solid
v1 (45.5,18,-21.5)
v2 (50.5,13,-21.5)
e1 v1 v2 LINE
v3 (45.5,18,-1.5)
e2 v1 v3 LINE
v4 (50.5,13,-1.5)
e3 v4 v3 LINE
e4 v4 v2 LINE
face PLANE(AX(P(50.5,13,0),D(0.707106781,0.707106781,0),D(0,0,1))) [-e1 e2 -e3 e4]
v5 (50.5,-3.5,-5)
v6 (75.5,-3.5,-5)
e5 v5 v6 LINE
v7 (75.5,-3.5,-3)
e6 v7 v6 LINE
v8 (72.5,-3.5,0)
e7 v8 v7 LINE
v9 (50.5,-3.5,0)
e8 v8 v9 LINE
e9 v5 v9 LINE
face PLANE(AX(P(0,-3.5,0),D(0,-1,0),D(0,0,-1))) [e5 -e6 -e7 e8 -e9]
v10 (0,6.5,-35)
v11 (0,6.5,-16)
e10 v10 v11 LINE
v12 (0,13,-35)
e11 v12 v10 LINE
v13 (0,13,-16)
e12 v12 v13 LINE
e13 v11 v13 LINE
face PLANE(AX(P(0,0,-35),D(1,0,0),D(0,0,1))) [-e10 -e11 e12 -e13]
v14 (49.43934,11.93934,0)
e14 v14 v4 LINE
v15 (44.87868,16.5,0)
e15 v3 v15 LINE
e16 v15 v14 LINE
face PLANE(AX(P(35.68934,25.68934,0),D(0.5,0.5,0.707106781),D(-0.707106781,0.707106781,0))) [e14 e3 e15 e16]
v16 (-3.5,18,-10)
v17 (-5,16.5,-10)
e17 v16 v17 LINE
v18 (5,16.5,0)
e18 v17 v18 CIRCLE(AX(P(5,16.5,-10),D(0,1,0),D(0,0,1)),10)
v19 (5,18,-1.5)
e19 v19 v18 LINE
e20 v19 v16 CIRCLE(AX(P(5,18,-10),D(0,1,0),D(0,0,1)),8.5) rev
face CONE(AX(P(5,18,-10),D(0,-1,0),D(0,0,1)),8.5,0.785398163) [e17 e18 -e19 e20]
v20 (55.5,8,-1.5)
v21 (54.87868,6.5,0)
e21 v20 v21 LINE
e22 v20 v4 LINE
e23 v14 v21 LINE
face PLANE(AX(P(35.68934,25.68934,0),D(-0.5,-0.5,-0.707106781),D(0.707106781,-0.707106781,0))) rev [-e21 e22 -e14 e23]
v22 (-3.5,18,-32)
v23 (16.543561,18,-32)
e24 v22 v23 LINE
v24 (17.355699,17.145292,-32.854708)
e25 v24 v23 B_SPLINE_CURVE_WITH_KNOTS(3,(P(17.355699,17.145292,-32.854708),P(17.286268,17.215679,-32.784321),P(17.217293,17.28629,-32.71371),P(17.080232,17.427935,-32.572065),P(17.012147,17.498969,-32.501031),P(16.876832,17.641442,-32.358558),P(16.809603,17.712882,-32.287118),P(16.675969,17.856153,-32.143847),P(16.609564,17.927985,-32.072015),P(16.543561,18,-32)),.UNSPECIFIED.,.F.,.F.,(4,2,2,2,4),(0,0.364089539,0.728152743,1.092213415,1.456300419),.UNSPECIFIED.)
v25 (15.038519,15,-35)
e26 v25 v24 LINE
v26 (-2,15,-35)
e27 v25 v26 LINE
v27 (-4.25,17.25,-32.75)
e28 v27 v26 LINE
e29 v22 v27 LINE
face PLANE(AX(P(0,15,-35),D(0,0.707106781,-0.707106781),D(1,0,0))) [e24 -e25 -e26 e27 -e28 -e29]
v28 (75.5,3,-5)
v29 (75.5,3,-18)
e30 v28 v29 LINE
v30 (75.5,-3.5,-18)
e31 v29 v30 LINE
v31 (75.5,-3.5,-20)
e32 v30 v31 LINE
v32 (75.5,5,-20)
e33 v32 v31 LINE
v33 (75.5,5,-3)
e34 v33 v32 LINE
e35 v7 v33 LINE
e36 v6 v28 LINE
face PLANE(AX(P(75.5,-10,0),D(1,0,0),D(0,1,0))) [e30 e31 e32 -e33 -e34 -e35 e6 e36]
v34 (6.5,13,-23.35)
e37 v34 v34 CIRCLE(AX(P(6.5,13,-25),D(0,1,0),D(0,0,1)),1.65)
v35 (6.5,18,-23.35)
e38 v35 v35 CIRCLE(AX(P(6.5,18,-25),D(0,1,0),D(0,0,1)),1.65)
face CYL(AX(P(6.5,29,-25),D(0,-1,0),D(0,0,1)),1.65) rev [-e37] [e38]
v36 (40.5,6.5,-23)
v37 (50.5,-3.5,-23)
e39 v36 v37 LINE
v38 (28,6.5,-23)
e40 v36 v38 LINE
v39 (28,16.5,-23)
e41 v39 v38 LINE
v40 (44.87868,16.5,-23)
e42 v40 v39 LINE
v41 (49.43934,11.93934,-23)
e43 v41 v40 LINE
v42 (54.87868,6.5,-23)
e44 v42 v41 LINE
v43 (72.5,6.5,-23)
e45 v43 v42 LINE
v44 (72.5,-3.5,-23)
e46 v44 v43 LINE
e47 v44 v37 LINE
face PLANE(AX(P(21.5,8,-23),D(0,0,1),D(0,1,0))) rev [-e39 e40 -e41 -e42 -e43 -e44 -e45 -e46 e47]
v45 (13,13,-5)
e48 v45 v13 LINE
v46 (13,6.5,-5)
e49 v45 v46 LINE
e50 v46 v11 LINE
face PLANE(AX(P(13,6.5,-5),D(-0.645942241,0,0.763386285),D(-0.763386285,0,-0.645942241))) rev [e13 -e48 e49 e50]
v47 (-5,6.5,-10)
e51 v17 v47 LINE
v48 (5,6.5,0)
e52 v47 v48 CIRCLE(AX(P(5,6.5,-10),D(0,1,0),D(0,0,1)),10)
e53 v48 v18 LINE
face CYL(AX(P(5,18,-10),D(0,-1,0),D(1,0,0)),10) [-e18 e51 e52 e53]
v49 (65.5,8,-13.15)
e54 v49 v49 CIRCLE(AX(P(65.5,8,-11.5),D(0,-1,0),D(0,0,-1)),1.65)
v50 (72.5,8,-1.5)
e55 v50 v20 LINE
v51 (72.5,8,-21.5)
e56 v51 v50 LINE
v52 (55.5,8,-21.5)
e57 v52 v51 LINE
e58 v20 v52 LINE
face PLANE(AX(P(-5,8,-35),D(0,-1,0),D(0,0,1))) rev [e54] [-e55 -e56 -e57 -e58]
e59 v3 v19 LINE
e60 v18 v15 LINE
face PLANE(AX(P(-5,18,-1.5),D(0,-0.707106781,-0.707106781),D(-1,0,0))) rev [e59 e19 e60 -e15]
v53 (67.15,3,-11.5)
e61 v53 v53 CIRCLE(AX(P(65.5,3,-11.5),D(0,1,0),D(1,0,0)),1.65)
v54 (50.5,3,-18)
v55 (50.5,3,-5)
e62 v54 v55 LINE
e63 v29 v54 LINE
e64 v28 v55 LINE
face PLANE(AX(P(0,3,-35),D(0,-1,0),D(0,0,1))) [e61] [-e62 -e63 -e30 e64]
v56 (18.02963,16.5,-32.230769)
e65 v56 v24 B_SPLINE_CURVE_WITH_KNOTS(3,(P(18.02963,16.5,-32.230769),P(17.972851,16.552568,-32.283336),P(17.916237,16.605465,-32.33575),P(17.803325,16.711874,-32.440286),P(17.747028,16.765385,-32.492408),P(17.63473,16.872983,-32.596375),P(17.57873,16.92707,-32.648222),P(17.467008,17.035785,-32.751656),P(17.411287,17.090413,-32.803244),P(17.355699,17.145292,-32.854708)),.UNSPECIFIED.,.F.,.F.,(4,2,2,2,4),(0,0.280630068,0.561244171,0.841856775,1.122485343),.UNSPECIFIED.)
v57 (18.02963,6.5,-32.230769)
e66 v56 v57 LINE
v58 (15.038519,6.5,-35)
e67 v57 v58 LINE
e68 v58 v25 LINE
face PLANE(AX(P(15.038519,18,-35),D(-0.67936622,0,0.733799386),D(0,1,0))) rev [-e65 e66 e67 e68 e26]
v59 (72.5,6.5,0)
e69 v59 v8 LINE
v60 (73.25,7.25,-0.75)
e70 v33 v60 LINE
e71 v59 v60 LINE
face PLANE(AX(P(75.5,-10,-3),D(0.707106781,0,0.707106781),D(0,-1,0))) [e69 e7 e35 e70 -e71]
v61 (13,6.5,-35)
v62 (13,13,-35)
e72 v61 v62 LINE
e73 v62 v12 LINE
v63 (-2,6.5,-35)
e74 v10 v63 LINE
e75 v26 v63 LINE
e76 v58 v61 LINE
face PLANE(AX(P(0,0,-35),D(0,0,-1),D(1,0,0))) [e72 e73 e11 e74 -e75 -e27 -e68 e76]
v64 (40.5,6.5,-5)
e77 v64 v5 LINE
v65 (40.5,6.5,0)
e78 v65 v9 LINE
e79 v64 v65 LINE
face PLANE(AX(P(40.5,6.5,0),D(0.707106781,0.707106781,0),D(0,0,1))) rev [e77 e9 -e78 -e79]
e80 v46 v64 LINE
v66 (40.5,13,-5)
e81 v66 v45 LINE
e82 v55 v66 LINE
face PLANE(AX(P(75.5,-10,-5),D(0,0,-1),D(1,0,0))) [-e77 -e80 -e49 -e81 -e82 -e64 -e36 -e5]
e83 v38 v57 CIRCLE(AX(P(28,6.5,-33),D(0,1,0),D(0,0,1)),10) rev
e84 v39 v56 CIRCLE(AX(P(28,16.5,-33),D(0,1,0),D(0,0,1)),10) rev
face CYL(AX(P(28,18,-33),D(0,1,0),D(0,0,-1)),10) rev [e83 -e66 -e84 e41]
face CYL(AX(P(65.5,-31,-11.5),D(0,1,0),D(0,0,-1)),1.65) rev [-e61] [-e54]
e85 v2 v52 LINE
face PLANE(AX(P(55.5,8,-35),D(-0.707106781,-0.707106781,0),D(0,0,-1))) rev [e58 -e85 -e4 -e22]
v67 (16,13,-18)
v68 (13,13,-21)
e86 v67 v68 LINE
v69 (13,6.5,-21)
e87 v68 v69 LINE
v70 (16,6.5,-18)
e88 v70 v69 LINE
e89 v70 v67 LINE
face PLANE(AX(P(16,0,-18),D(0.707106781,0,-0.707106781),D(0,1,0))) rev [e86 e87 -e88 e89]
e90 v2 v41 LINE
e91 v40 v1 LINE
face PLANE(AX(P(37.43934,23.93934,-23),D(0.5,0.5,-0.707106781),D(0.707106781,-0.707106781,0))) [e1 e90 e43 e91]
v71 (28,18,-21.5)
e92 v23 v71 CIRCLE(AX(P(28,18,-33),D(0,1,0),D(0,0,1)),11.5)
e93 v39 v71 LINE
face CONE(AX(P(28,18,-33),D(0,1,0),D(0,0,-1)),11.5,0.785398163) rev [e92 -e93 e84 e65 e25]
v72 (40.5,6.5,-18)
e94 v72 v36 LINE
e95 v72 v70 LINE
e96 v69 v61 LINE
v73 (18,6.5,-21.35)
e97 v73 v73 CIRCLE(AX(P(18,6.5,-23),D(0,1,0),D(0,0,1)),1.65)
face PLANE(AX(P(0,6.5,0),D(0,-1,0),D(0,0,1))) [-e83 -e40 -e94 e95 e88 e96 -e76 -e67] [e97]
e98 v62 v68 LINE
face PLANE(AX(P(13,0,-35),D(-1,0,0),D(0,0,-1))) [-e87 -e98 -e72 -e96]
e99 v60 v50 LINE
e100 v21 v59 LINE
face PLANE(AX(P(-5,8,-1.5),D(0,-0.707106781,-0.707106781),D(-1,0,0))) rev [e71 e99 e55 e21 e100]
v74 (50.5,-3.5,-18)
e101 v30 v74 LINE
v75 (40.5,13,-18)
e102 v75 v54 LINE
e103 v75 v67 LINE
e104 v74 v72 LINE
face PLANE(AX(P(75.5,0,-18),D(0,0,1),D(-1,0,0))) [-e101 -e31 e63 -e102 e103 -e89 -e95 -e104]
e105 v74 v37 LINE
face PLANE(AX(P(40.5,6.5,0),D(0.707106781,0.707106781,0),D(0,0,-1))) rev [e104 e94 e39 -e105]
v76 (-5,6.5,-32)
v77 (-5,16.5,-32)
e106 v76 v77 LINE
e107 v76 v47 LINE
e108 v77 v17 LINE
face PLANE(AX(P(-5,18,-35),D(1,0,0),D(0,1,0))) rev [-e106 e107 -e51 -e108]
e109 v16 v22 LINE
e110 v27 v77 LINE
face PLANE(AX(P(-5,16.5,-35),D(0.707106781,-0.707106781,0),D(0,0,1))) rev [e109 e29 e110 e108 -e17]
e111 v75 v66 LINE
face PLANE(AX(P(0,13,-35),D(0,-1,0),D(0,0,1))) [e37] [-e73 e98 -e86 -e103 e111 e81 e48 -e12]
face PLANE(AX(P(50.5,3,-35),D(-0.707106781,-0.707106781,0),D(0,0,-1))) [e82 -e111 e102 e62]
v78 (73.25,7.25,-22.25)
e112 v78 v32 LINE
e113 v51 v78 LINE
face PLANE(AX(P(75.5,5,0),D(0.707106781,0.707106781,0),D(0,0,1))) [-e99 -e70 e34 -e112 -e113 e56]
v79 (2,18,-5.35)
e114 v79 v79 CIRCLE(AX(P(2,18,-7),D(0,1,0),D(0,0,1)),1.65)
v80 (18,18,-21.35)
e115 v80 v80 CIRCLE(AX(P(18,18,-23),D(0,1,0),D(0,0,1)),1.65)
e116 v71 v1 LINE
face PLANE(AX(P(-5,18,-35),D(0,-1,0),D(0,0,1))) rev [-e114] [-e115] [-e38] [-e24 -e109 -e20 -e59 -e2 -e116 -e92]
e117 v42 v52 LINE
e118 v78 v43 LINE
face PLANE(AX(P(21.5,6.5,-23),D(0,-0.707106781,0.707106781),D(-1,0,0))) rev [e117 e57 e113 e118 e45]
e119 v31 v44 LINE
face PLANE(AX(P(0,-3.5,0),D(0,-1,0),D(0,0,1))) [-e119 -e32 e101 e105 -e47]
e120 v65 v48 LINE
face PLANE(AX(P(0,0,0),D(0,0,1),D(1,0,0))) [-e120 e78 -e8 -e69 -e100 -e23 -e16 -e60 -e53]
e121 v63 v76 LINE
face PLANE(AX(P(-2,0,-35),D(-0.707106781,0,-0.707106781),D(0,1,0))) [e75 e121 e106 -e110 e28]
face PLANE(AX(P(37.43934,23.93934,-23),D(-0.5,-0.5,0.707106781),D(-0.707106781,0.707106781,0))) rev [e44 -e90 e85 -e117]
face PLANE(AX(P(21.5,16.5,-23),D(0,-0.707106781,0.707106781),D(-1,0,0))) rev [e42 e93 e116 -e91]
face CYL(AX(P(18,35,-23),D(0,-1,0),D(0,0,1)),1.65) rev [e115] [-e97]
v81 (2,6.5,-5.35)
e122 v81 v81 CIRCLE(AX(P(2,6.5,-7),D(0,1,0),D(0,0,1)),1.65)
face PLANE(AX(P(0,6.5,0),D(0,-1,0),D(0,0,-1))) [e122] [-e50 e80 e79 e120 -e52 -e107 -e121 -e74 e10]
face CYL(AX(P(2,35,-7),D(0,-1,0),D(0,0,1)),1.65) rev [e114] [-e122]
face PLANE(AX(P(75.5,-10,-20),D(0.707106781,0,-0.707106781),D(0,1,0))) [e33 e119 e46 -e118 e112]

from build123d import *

# Parameters (mm, degrees)
SKETCH_1_W          = 23
SKETCH_1_H          = 23
SKETCH_1_W_2        = 13
SKETCH_1_H_2        = 13
EXTRUDE_1_DEPTH     = 35
SKETCH_2_R          = 1.65
CUT_EXTRUDE_1_DEPTH = 34
SKETCH_4_W          = 23
SKETCH_4_H          = 23
SKETCH_4_R          = 3
EXTRUDE_2_DEPTH     = 3.5
SKETCH_5_W          = 23
SKETCH_5_H          = 23
SKETCH_5_W_2        = 13
SKETCH_5_H_2        = 13
EXTRUDE_1_2_DEPTH   = 54
SKETCH_6_R          = 1.65
CUT_EXTRUDE_2_DEPTH = 39
SKETCH_7_W          = 13
SKETCH_7_H          = 13
CUT_EXTRUDE_3_DEPTH = 13
CHAMFER_1_SIZE      = 3
SKETCH_8_W          = 80.5
SKETCH_8_H          = 35
CUT_EXTRUDE_4_DEPTH = 11.5
EXTRUDE_3_DEPTH     = 6.5
FILLET_1_R          = 10
FILLET_2_R          = 10
SKETCH_10_R         = 1.65
CUT_EXTRUDE_5_DEPTH = 28.5
CHAMFER_4_SIZE      = 3
CHAMFER_START       = 6.5
CHAMFER_5_DEPTH     = 11.5
SKETCH_11_W         = 10
SKETCH_11_H         = 13
EXTRUDE_4_DEPTH     = 10
CHAMFER_9_SIZE      = 5
CHAMFER_10_SIZE     = 5
CHAMFER_11_SIZE     = 10
CHAMFER_12_SIZE     = 10
CHAMFER_13_SIZE     = 1.5
CHAMFER_14_SIZE     = 1.5
SKETCH_12_W         = 99.580162389
SKETCH_12_H         = 41.70081518
CUT_EXTRUDE_6_DEPTH = 35


with BuildPart() as part:
    # 草图1 → Extrude 1 (new body)
    with BuildSketch(Plane.XY):
        with Locations((6.5, 6.5)):
            Rectangle(SKETCH_1_W, SKETCH_1_H)
        with Locations((6.5, 6.5)):
            Rectangle(SKETCH_1_W_2, SKETCH_1_H_2, mode=Mode.SUBTRACT)
    extrude(amount=EXTRUDE_1_DEPTH)

    # 草图2 → 切除-拉伸1 (cut)
    with BuildSketch(Plane.XZ.offset(5)):
        with Locations(Location((6.5, 25, 0), (0, 0, 270))):
            Circle(SKETCH_2_R)
    extrude(amount=-CUT_EXTRUDE_1_DEPTH, mode=Mode.SUBTRACT)

    # 草图4 → 凸台-拉伸2 (add)
    with BuildSketch(Plane(origin=(18, 0, 0), x_dir=(0, 0, -1), z_dir=(1, 0, 0))):
        with Locations((-11.5, 6.5)):
            Rectangle(SKETCH_4_W, SKETCH_4_H)
        with Locations(Location((-11.5, 6.5, 0), (0, 0, 90))):
            Circle(SKETCH_4_R, mode=Mode.SUBTRACT)
    extrude(amount=EXTRUDE_2_DEPTH)

    # 草图5 → Extrude 1 2 (add)
    with BuildSketch(Plane(origin=(21.5, 0, 0), x_dir=(0, 0, -1), z_dir=(1, 0, 0))):
        with Locations((-11.5, 6.5)):
            Rectangle(SKETCH_5_W, SKETCH_5_H)
        with Locations((-11.5, 6.5)):
            Rectangle(SKETCH_5_W_2, SKETCH_5_H_2, mode=Mode.SUBTRACT)
    extrude(amount=EXTRUDE_1_2_DEPTH)

    # 草图6 → 切除-拉伸2 (cut)
    with BuildSketch(Plane(origin=(0, 18, 0), x_dir=(1, 0, 0), z_dir=(0, 1, 0))):
        with Locations(Location((65.5, -11.5, 0), (0, 0, 270))):
            Circle(SKETCH_6_R)
    extrude(amount=-CUT_EXTRUDE_2_DEPTH, mode=Mode.SUBTRACT)

    # 草图7 → 切除-拉伸3 (cut)
    with BuildSketch(Plane(origin=(21.5, 0, 0), x_dir=(0, 0, -1), z_dir=(1, 0, 0))):
        with Locations((-11.5, 6.5)):
            Rectangle(SKETCH_7_W, SKETCH_7_H)
    extrude(amount=-CUT_EXTRUDE_3_DEPTH, mode=Mode.SUBTRACT)

    # 倒角1
    chamfer_1_edges = [part.edges().sort_by_distance(p)[0] for p in [
        (13, 6.5, 18),
    ]]
    chamfer(chamfer_1_edges, length=CHAMFER_1_SIZE)

    # 草图8 → 切除-拉伸4 (cut)
    with BuildSketch(Plane.XZ.offset(5)):
        with Locations((35.25, 17.5)):
            Rectangle(SKETCH_8_W, SKETCH_8_H)
    extrude(amount=-CUT_EXTRUDE_4_DEPTH, mode=Mode.SUBTRACT)

    # 草图9 → 凸台-拉伸3 (add)
    with BuildSketch(Plane.XZ.offset(-13)):
        Polygon((13, 5), (0, 16), (0, 0), (13, 0), align=None)
    extrude(amount=EXTRUDE_3_DEPTH)

    # 圆角1
    fillet_1_edges = [part.edges().sort_by_distance(p)[0] for p in [
        (-5, 12.25, 0),
    ]]
    fillet(fillet_1_edges, radius=FILLET_1_R)

    # 圆角2
    fillet_2_edges = [part.edges().sort_by_distance(p)[0] for p in [
        (18, 12.25, 23),
    ]]
    fillet(fillet_2_edges, radius=FILLET_2_R)

    # 草图10 → 切除-拉伸5 (cut)
    with BuildSketch(Plane.XZ.offset(-6.5)):
        with Locations(Location((2, 7, 0), (0, 0, 270))):
            Circle(SKETCH_10_R)
        with Locations(Location((18, 23, 0), (0, 0, 270))):
            Circle(SKETCH_10_R)
    extrude(amount=-CUT_EXTRUDE_5_DEPTH, mode=Mode.SUBTRACT)

    # 倒角4
    chamfer_4_edges = [part.edges().sort_by_distance(p)[0] for p in [
        (75.5, 18, 11.5),
        (6.5, 18, 35),
    ]]
    chamfer(chamfer_4_edges, length=CHAMFER_4_SIZE)

    # 倒角5: read off the stored shape, not the designer's step
    # 倒角5 outline → 倒角5 (cut)
    with BuildSketch(Plane(origin=(0, 0, 0), x_dir=(1, 0, 0), z_dir=(0, 1, 0)).offset(CHAMFER_START)):
        Polygon((72.5, 0), (75.5, -3), (75.5, 0), align=None)
        Polygon((-5, -35), (-2, -35), (-5, -32), align=None)
        with BuildLine():
            ThreePointArc((18, -33), (18.007410169, -32.615099398), (18.029629695, -32.230769231))
            Line((18.029629695, -32.230769231), (15.038518603, -35))
            Line((15.038518603, -35), (18, -35))
            Line((18, -35), (18, -33))
        make_face()
        Polygon((75.5, -20), (72.5, -23), (75.5, -23), align=None)
    extrude(amount=CHAMFER_5_DEPTH, mode=Mode.SUBTRACT)


with BuildPart() as body_2:
    # Split Bodies 1: the piece on the far side of the plane
    add(part.part)
    split(bisect_by=Plane.YZ.offset(50.5), keep=Keep.BOTTOM)


with BuildPart() as part_1:
    add(part.part)

    # Split Bodies 1
    split(bisect_by=Plane.YZ.offset(50.5), keep=Keep.TOP)


with BuildPart() as part_2:
    # Move Body 1: read off the stored shape, not the designer's step
    # Move Body 1: moved
    add(part_1.part.moved(Location((0, -10, 0))))

    # Combine 1: union body 2
    add(body_2.part)

    # 草图11 → 凸台-拉伸4 (add)
    with BuildSketch(Plane.XZ.offset(-13)):
        with Locations((45.5, 11.5)):
            Rectangle(SKETCH_11_W, SKETCH_11_H)
    extrude(amount=EXTRUDE_4_DEPTH)

    # 倒角9
    chamfer_9_edges = [part_2.edges().sort_by_distance(p)[0] for p in [
        (50.5, 18, 11.5),
    ]]
    chamfer(chamfer_9_edges, length=CHAMFER_9_SIZE)

    # 倒角10
    chamfer_10_edges = [part_2.edges().sort_by_distance(p)[0] for p in [
        (50.5, 8, 11.5),
    ]]
    chamfer(chamfer_10_edges, length=CHAMFER_10_SIZE - 0.0001)  # a hair under: the kernel refuses the full size

    # 倒角11
    # the kernel refuses this chamfer: 10 mm, written as the material it adds along each edge
    with BuildSketch(Plane(origin=(50.5, 6.5, 30.71682988), x_dir=(-1, 0, 0), z_dir=(0, 0, -1))) as chamfer_11_piece_1_section:
        Polygon((CHAMFER_11_SIZE, 0), (0, -CHAMFER_11_SIZE), (0, 0), align=None)
    chamfer_11_piece_1 = extrude(amount=30.71682988, mode=Mode.PRIVATE)
    chamfer_11_piece_1 = split(chamfer_11_piece_1, bisect_by=Plane(origin=(50.5, -3.5, 30.71682988), z_dir=(0, 1, 0)), keep=Keep.TOP, mode=Mode.PRIVATE)
    chamfer_11_piece_1 = split(chamfer_11_piece_1, bisect_by=Plane(origin=(50.5, 6.5, 23), z_dir=(0, 0, -1)), keep=Keep.TOP, mode=Mode.PRIVATE)
    chamfer_11_piece_1 = split(chamfer_11_piece_1, bisect_by=Plane(origin=(50.5, 6.5, 18), z_dir=(0, 0, 1)), keep=Keep.TOP, mode=Mode.PRIVATE)
    add(chamfer_11_piece_1)
    with BuildSketch(Plane(origin=(50.5, 6.5, 5), x_dir=(-1, 0, 0), z_dir=(0, 0, -1))) as chamfer_11_piece_2_section:
        Polygon((CHAMFER_11_SIZE, 0), (0, -CHAMFER_11_SIZE), (0, 0), align=None)
    chamfer_11_piece_2 = extrude(amount=5, mode=Mode.PRIVATE)
    chamfer_11_piece_2 = split(chamfer_11_piece_2, bisect_by=Plane(origin=(50.5, -3.5, 5), z_dir=(0, 1, 0)), keep=Keep.TOP, mode=Mode.PRIVATE)
    add(chamfer_11_piece_2)
    with BuildSketch(Plane(origin=(50.5, 6.5, 23), x_dir=(-1, 0, 0), z_dir=(0, 0, -1))) as chamfer_11_piece_3_section:
        Polygon((CHAMFER_11_SIZE, 0), (0, -CHAMFER_11_SIZE), (0, 0), align=None)
    chamfer_11_piece_3 = extrude(amount=5, mode=Mode.PRIVATE)
    chamfer_11_piece_3 = split(chamfer_11_piece_3, bisect_by=Plane(origin=(50.5, -3.5, 23), z_dir=(0, 1, 0)), keep=Keep.TOP, mode=Mode.PRIVATE)
    add(chamfer_11_piece_3)
    with BuildSketch(Plane(origin=(50.5, 6.5, 23), x_dir=(-1, 0, 0), z_dir=(0, 0, -1))) as chamfer_11_piece_4_section:
        Polygon((CHAMFER_11_SIZE, 0), (0, -CHAMFER_11_SIZE), (0, 0), align=None)
    chamfer_11_piece_4 = extrude(amount=30.71682988, mode=Mode.PRIVATE)
    chamfer_11_piece_4 = split(chamfer_11_piece_4, bisect_by=Plane(origin=(50.5, 6.5, 0), z_dir=(0, 0, 1)), keep=Keep.TOP, mode=Mode.PRIVATE)
    chamfer_11_piece_4 = split(chamfer_11_piece_4, bisect_by=Plane(origin=(50.5, -3.5, 23), z_dir=(0, 1, 0)), keep=Keep.TOP, mode=Mode.PRIVATE)
    chamfer_11_piece_4 = split(chamfer_11_piece_4, bisect_by=Plane(origin=(50.5, 6.5, 5), z_dir=(0, 0, -1)), keep=Keep.TOP, mode=Mode.PRIVATE)
    add(chamfer_11_piece_4)

    # 倒角12
    # the kernel refuses this chamfer: 10 mm, written as the material it takes off along each edge
    with BuildSketch(Plane(origin=(40.5, 3, 5), x_dir=(1, 0, 0), z_dir=(0, 0, 1))) as chamfer_12_piece_1:
        Polygon((CHAMFER_12_SIZE, 0), (0, CHAMFER_12_SIZE), (0, 0), align=None)
    extrude(amount=13, mode=Mode.SUBTRACT)

    # 倒角13
    chamfer_13_edges = [part_2.edges().sort_by_distance(p)[0] for p in [
        (-5, 18, 21),
        (-2.071067812, 18, 2.928932188),
        (25.25, 18, 0),
        (21.291796068, 18, 25.583801513),
        (36.75, 18, 23),
    ]]
    chamfer(chamfer_13_edges, length=CHAMFER_13_SIZE)

    # 倒角14
    chamfer_14_edges = [part_2.edges().sort_by_distance(p)[0] for p in [
        (48.75, 14.75, 0),
        (50.5, 12.99995, 0),
        (52.99995, 10.49995, 0),
        (63.99995, 8, 0),
        (48.75, 14.75, 23),
        (50.5, 12.99995, 23),
        (52.99995, 10.49995, 23),
        (63.99995, 8, 23),
    ]]
    chamfer(chamfer_14_edges, length=CHAMFER_14_SIZE)

    # 镜向1: part across face


with BuildPart() as part_3:
    add(part_2.part)
    add(part_2.part.mirror(Plane(origin=(39.29455316, 7.74366918, 0), x_dir=(1, 0, 0), z_dir=(0, 0, -1))))

    # 草图12 → 切除-拉伸6 (cut)
    with BuildSketch(Plane.XY.offset(35)):
        with Locations((40.094907988, 6.821209465)):
            Rectangle(SKETCH_12_W, SKETCH_12_H)
    extrude(amount=-CUT_EXTRUDE_6_DEPTH, mode=Mode.SUBTRACT)


solid = part_3.part
